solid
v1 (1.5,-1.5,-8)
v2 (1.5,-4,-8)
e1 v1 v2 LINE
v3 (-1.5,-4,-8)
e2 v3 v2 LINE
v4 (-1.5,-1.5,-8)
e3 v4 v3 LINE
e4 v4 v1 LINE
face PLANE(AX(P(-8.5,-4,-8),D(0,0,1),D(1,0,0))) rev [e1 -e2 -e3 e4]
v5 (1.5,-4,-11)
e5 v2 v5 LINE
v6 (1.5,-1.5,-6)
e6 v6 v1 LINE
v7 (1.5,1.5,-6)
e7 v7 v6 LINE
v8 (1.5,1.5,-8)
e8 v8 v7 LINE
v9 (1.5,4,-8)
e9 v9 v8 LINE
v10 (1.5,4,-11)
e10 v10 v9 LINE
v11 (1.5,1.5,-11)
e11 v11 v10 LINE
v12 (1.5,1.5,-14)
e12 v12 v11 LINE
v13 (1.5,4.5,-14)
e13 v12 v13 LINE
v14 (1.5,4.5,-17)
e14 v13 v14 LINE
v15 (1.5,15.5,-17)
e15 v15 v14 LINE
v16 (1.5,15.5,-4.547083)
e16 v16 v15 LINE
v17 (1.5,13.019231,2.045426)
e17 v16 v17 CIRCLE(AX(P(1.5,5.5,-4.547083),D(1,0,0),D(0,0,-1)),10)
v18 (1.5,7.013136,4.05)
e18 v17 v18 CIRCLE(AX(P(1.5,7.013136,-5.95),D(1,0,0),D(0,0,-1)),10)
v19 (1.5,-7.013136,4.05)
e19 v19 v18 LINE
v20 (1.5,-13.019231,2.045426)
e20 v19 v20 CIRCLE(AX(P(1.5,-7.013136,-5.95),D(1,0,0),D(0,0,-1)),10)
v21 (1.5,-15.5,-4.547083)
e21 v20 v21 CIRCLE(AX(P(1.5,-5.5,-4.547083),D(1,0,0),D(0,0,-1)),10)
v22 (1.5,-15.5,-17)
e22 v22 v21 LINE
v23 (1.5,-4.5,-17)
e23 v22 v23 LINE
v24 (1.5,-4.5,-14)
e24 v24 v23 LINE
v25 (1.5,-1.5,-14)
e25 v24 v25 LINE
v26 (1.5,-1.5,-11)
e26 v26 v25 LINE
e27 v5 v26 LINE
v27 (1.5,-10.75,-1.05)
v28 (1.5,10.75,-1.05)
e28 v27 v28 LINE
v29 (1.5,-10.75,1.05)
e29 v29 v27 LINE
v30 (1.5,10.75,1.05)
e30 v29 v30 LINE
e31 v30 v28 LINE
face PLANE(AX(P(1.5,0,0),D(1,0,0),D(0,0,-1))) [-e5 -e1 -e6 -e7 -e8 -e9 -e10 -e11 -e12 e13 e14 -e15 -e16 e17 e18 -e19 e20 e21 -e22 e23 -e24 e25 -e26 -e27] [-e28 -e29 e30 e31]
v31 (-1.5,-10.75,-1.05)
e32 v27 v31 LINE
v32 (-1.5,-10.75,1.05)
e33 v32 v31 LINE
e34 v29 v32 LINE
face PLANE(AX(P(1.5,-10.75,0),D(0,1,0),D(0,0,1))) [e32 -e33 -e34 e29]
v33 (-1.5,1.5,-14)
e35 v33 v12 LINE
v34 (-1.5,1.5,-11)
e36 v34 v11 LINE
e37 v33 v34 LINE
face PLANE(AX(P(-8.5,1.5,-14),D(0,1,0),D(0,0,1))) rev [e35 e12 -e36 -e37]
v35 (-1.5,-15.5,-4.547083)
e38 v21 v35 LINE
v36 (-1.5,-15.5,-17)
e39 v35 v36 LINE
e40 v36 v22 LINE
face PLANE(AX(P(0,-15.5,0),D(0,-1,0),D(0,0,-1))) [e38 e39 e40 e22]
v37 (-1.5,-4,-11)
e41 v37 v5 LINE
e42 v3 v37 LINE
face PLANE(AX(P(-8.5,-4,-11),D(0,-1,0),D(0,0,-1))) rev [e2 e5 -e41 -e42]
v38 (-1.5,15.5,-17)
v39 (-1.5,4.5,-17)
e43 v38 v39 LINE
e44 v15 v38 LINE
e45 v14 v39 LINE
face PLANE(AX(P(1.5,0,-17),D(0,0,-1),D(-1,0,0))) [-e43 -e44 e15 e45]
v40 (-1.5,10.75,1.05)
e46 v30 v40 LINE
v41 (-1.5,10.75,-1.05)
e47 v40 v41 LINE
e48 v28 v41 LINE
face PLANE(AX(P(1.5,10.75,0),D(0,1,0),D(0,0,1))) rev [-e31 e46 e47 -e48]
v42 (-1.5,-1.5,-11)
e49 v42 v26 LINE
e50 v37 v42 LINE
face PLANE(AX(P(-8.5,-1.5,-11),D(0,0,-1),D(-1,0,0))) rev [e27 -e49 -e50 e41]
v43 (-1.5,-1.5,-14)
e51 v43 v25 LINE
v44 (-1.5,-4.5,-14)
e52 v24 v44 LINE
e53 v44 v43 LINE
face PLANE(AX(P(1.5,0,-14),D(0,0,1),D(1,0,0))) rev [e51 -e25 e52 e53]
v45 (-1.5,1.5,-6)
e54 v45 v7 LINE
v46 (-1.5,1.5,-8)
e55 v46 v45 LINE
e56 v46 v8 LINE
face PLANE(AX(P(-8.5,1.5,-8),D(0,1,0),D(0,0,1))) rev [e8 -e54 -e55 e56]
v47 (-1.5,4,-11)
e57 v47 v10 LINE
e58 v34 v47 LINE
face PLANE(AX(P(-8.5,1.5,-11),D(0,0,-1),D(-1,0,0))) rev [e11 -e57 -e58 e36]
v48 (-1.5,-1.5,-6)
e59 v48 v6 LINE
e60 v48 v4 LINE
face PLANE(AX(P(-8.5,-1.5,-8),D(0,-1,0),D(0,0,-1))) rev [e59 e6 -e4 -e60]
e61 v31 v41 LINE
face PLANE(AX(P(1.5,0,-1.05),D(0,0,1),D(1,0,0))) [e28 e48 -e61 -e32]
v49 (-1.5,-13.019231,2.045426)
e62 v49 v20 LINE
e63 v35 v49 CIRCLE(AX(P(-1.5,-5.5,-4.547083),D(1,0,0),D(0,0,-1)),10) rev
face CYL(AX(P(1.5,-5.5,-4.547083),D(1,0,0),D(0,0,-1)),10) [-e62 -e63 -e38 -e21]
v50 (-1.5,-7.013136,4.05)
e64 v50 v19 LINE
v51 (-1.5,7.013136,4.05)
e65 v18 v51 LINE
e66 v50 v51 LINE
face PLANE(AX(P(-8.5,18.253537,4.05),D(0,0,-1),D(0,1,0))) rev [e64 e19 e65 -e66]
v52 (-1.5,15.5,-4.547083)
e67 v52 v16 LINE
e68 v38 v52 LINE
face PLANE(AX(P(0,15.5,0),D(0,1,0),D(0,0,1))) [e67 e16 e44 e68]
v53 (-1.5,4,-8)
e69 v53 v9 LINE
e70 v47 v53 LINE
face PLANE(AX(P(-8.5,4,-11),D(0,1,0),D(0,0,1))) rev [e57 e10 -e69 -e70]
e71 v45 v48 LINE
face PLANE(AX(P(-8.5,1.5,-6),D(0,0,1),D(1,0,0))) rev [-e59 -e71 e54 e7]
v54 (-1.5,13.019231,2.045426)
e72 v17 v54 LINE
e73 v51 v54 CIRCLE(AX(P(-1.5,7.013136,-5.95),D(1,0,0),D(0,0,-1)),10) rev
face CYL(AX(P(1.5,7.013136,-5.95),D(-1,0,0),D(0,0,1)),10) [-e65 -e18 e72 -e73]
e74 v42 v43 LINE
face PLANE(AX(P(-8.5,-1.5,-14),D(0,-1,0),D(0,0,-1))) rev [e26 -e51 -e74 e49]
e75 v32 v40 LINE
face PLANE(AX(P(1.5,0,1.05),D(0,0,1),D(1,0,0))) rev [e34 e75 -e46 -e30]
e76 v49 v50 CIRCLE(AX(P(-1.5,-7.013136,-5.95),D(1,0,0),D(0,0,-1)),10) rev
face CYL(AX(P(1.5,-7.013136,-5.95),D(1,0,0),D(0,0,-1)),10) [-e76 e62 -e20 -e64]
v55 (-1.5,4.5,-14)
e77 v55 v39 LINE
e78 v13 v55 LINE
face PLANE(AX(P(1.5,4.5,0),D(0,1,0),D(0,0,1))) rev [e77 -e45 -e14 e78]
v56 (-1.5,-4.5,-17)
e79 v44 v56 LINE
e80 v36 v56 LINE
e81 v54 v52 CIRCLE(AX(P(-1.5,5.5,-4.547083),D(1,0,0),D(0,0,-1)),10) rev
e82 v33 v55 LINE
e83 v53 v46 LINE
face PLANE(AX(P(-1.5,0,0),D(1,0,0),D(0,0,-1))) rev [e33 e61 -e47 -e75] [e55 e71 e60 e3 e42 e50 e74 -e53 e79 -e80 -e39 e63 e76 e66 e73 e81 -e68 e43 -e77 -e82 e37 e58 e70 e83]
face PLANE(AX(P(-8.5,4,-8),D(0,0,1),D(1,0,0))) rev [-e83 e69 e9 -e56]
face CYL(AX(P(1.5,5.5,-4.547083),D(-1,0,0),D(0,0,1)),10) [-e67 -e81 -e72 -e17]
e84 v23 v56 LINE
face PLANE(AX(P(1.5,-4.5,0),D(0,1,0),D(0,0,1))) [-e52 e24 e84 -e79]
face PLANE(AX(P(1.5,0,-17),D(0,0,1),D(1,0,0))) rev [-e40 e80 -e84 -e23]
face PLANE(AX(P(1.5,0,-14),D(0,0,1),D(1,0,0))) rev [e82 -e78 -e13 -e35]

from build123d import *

# Parameters (mm, degrees)
CROQUIS1_W              = 2.1
CROQUIS1_H              = 21.5
SALIENTE_EXTRUIR1_DEPTH = 1.5
REDONDEO1_R             = 10
CROQUIS2_W              = 3
CROQUIS2_H              = 17
SALIENTE_EXTRUIR2_DEPTH = 3
CROQUIS3_W              = 3
CROQUIS3_H              = 17
SALIENTE_EXTRUIR3_DEPTH = 3
REDONDEO2_R             = 10
REDONDEO3_R             = 10
CROQUIS5_W              = 21.447905668
CROQUIS5_H              = 38.241159468
CORTAR_EXTRUIR2_DEPTH   = 10
REDONDEO4_R             = 10
CORTAR_EXTRUIR3_DEPTH   = 10


with BuildPart() as part:
    # Croquis1 → Saliente-Extruir1 (new, symmetric)
    with BuildSketch(Plane(origin=(0, 0, 0), x_dir=(0, 0, -1), z_dir=(1, 0, 0))):
        Polygon((14, -12.5), (17, -12.5), (17, -4.5), (14, -4.5), (14, 4.5), (17, 4.5), (17, 12.5), (-10, 12.5), (-10, -12.5), align=None)
        Rectangle(CROQUIS1_W, CROQUIS1_H, mode=Mode.SUBTRACT)
    extrude(amount=SALIENTE_EXTRUIR1_DEPTH, both=True)

    # Redondeo1
    redondeo1_edges = [part.edges().sort_by_distance(p)[0] for p in [
        (0, -12.5, 10),
        (0, 12.5, 10),
    ]]
    fillet(redondeo1_edges, radius=REDONDEO1_R)

    # Croquis2 → Saliente-Extruir2 (add)
    with BuildSketch(Plane(origin=(0, 12.5, 0), x_dir=(1, 0, 0), z_dir=(0, 1, 0))):
        with Locations((0, 8.5)):
            Rectangle(CROQUIS2_W, CROQUIS2_H)
    extrude(amount=SALIENTE_EXTRUIR2_DEPTH)

    # Croquis3 → Saliente-Extruir3 (add)
    with BuildSketch(Plane.XZ.offset(12.5)):
        with Locations((0, -8.5)):
            Rectangle(CROQUIS3_W, CROQUIS3_H)
    extrude(amount=SALIENTE_EXTRUIR3_DEPTH)

    # Redondeo2
    # the kernel refuses this fillet: 10 mm, written as the material it adds along each edge
    with BuildSketch(Plane(origin=(1.5, -12.5, 0), x_dir=(0, -1, 0), z_dir=(-1, 0, 0))) as redondeo2_piece_1:
        with BuildLine():
            CenterArc((8.038461538, 8.637934089), REDONDEO2_R, 205.587990121, 34.157222478)
            Line((-0.980769231, 4.318967044), (-1.161153846, 4.232587704))
            ThreePointArc((-1.161153846, 4.232587704), (-0.443308828, 2.17017369), (-0.2, 0))
            Line((-0.2, 0), (0, -0.2))
            ThreePointArc((0, -0.2), (1.5, -0.2), (2.899230769, -0.172758682))
            Line((2.899230769, -0.172758682), (3, 0))
        make_face()
    extrude(amount=3)
    with BuildSketch(Plane(origin=(1.5, 12.5, 0), x_dir=(0, 1, 0), z_dir=(-1, 0, 0))) as redondeo2_piece_2:
        with BuildLine():
            CenterArc((8.038461538, -8.637934089), REDONDEO2_R, 120.254787401, 34.157222478)
            Line((-0.980769231, -4.318967044), (-1.161153846, -4.232587704))
            ThreePointArc((-1.161153846, -4.232587704), (-0.443308828, -2.17017369), (-0.2, 0))
            Line((-0.2, 0), (0, 0.2))
            ThreePointArc((0, 0.2), (1.5, 0.2), (2.899230769, 0.172758682))
            Line((2.899230769, 0.172758682), (3, 0))
        make_face()
    extrude(amount=3)

    # Redondeo3
    redondeo3_edges = [part.edges().sort_by_distance(p)[0] for p in [
        (0, 15.5, 0),
        (0, -15.5, 0),
    ]]
    fillet(redondeo3_edges, radius=REDONDEO3_R)

    # Croquis5 → Cortar-Extruir2 (cut)
    with BuildSketch(Plane(origin=(1.5, 0, 0), x_dir=(0, 0, -1), z_dir=(1, 0, 0))):
        with Locations((-14.773952834, -0.867042995)):
            Rectangle(CROQUIS5_W, CROQUIS5_H)
    extrude(amount=-CORTAR_EXTRUIR2_DEPTH, mode=Mode.SUBTRACT)

    # Redondeo4
    # the kernel refuses this fillet: 10 mm, written as the material it takes off along each edge
    with BuildSketch(Plane(origin=(-13.099738715, 11.653031847, 4.05), x_dir=(0, 0.5631802476031196, -0.8263340781485954), z_dir=(1, 0, 0))) as redondeo4_piece_1:
        with BuildLine():
            CenterArc((5.650243293, -9.465906235), REDONDEO4_R, 108.810422247, 36.913558107)
            Line((-2.613097489, -3.834103759), (-2.778364304, -3.72146771))
            Line((-2.778364304, -3.72146771), (-0.165266816, 0.11263605))
            Line((-0.165266816, 0.11263605), (0.024258644, 0.198523344))
            ThreePointArc((0.024258644, 0.198523344), (1.212932207, 0.126167209), (2.361376837, 0.189318125))
            Line((2.361376837, 0.189318125), (2.425864415, 0))
        make_face()
    extrude(amount=26.19947743, mode=Mode.SUBTRACT)
    with BuildSketch(Plane(origin=(-13.099738715, -11.653031847, 4.05), x_dir=(0, 1, 0), z_dir=(1, 0, 0))) as redondeo4_piece_2:
        with BuildLine():
            CenterArc((4.639895486, -10), REDONDEO4_R, 90, 36.913558107)
            Line((-1.366198922, -2.004574435), (-1.48632081, -1.844665924))
            ThreePointArc((-1.48632081, -1.844665924), (-0.787355725, -0.931232338), (-0.177708594, 0.091758682))
            Line((-0.177708594, 0.091758682), (0, 0.2))
            Line((0, 0.2), (4.639895486, 0.2))
            Line((4.639895486, 0.2), (4.639895486, 0))
        make_face()
    extrude(amount=26.19947743, mode=Mode.SUBTRACT)

    # Croquis6 → Cortar-Extruir3 (cut)
    with BuildSketch(Plane(origin=(1.5, 0, 0), x_dir=(0, 0, -1), z_dir=(1, 0, 0))):
        Polygon((14, 1.5), (11, 1.5), (11, 4), (8, 4), (8, 1.5), (6, 1.5), (6, -1.5), (8, -1.5), (8, -4), (11, -4), (11, -1.5), (14, -1.5), align=None)
    extrude(amount=-CORTAR_EXTRUIR3_DEPTH, mode=Mode.SUBTRACT)


solid = part.part
